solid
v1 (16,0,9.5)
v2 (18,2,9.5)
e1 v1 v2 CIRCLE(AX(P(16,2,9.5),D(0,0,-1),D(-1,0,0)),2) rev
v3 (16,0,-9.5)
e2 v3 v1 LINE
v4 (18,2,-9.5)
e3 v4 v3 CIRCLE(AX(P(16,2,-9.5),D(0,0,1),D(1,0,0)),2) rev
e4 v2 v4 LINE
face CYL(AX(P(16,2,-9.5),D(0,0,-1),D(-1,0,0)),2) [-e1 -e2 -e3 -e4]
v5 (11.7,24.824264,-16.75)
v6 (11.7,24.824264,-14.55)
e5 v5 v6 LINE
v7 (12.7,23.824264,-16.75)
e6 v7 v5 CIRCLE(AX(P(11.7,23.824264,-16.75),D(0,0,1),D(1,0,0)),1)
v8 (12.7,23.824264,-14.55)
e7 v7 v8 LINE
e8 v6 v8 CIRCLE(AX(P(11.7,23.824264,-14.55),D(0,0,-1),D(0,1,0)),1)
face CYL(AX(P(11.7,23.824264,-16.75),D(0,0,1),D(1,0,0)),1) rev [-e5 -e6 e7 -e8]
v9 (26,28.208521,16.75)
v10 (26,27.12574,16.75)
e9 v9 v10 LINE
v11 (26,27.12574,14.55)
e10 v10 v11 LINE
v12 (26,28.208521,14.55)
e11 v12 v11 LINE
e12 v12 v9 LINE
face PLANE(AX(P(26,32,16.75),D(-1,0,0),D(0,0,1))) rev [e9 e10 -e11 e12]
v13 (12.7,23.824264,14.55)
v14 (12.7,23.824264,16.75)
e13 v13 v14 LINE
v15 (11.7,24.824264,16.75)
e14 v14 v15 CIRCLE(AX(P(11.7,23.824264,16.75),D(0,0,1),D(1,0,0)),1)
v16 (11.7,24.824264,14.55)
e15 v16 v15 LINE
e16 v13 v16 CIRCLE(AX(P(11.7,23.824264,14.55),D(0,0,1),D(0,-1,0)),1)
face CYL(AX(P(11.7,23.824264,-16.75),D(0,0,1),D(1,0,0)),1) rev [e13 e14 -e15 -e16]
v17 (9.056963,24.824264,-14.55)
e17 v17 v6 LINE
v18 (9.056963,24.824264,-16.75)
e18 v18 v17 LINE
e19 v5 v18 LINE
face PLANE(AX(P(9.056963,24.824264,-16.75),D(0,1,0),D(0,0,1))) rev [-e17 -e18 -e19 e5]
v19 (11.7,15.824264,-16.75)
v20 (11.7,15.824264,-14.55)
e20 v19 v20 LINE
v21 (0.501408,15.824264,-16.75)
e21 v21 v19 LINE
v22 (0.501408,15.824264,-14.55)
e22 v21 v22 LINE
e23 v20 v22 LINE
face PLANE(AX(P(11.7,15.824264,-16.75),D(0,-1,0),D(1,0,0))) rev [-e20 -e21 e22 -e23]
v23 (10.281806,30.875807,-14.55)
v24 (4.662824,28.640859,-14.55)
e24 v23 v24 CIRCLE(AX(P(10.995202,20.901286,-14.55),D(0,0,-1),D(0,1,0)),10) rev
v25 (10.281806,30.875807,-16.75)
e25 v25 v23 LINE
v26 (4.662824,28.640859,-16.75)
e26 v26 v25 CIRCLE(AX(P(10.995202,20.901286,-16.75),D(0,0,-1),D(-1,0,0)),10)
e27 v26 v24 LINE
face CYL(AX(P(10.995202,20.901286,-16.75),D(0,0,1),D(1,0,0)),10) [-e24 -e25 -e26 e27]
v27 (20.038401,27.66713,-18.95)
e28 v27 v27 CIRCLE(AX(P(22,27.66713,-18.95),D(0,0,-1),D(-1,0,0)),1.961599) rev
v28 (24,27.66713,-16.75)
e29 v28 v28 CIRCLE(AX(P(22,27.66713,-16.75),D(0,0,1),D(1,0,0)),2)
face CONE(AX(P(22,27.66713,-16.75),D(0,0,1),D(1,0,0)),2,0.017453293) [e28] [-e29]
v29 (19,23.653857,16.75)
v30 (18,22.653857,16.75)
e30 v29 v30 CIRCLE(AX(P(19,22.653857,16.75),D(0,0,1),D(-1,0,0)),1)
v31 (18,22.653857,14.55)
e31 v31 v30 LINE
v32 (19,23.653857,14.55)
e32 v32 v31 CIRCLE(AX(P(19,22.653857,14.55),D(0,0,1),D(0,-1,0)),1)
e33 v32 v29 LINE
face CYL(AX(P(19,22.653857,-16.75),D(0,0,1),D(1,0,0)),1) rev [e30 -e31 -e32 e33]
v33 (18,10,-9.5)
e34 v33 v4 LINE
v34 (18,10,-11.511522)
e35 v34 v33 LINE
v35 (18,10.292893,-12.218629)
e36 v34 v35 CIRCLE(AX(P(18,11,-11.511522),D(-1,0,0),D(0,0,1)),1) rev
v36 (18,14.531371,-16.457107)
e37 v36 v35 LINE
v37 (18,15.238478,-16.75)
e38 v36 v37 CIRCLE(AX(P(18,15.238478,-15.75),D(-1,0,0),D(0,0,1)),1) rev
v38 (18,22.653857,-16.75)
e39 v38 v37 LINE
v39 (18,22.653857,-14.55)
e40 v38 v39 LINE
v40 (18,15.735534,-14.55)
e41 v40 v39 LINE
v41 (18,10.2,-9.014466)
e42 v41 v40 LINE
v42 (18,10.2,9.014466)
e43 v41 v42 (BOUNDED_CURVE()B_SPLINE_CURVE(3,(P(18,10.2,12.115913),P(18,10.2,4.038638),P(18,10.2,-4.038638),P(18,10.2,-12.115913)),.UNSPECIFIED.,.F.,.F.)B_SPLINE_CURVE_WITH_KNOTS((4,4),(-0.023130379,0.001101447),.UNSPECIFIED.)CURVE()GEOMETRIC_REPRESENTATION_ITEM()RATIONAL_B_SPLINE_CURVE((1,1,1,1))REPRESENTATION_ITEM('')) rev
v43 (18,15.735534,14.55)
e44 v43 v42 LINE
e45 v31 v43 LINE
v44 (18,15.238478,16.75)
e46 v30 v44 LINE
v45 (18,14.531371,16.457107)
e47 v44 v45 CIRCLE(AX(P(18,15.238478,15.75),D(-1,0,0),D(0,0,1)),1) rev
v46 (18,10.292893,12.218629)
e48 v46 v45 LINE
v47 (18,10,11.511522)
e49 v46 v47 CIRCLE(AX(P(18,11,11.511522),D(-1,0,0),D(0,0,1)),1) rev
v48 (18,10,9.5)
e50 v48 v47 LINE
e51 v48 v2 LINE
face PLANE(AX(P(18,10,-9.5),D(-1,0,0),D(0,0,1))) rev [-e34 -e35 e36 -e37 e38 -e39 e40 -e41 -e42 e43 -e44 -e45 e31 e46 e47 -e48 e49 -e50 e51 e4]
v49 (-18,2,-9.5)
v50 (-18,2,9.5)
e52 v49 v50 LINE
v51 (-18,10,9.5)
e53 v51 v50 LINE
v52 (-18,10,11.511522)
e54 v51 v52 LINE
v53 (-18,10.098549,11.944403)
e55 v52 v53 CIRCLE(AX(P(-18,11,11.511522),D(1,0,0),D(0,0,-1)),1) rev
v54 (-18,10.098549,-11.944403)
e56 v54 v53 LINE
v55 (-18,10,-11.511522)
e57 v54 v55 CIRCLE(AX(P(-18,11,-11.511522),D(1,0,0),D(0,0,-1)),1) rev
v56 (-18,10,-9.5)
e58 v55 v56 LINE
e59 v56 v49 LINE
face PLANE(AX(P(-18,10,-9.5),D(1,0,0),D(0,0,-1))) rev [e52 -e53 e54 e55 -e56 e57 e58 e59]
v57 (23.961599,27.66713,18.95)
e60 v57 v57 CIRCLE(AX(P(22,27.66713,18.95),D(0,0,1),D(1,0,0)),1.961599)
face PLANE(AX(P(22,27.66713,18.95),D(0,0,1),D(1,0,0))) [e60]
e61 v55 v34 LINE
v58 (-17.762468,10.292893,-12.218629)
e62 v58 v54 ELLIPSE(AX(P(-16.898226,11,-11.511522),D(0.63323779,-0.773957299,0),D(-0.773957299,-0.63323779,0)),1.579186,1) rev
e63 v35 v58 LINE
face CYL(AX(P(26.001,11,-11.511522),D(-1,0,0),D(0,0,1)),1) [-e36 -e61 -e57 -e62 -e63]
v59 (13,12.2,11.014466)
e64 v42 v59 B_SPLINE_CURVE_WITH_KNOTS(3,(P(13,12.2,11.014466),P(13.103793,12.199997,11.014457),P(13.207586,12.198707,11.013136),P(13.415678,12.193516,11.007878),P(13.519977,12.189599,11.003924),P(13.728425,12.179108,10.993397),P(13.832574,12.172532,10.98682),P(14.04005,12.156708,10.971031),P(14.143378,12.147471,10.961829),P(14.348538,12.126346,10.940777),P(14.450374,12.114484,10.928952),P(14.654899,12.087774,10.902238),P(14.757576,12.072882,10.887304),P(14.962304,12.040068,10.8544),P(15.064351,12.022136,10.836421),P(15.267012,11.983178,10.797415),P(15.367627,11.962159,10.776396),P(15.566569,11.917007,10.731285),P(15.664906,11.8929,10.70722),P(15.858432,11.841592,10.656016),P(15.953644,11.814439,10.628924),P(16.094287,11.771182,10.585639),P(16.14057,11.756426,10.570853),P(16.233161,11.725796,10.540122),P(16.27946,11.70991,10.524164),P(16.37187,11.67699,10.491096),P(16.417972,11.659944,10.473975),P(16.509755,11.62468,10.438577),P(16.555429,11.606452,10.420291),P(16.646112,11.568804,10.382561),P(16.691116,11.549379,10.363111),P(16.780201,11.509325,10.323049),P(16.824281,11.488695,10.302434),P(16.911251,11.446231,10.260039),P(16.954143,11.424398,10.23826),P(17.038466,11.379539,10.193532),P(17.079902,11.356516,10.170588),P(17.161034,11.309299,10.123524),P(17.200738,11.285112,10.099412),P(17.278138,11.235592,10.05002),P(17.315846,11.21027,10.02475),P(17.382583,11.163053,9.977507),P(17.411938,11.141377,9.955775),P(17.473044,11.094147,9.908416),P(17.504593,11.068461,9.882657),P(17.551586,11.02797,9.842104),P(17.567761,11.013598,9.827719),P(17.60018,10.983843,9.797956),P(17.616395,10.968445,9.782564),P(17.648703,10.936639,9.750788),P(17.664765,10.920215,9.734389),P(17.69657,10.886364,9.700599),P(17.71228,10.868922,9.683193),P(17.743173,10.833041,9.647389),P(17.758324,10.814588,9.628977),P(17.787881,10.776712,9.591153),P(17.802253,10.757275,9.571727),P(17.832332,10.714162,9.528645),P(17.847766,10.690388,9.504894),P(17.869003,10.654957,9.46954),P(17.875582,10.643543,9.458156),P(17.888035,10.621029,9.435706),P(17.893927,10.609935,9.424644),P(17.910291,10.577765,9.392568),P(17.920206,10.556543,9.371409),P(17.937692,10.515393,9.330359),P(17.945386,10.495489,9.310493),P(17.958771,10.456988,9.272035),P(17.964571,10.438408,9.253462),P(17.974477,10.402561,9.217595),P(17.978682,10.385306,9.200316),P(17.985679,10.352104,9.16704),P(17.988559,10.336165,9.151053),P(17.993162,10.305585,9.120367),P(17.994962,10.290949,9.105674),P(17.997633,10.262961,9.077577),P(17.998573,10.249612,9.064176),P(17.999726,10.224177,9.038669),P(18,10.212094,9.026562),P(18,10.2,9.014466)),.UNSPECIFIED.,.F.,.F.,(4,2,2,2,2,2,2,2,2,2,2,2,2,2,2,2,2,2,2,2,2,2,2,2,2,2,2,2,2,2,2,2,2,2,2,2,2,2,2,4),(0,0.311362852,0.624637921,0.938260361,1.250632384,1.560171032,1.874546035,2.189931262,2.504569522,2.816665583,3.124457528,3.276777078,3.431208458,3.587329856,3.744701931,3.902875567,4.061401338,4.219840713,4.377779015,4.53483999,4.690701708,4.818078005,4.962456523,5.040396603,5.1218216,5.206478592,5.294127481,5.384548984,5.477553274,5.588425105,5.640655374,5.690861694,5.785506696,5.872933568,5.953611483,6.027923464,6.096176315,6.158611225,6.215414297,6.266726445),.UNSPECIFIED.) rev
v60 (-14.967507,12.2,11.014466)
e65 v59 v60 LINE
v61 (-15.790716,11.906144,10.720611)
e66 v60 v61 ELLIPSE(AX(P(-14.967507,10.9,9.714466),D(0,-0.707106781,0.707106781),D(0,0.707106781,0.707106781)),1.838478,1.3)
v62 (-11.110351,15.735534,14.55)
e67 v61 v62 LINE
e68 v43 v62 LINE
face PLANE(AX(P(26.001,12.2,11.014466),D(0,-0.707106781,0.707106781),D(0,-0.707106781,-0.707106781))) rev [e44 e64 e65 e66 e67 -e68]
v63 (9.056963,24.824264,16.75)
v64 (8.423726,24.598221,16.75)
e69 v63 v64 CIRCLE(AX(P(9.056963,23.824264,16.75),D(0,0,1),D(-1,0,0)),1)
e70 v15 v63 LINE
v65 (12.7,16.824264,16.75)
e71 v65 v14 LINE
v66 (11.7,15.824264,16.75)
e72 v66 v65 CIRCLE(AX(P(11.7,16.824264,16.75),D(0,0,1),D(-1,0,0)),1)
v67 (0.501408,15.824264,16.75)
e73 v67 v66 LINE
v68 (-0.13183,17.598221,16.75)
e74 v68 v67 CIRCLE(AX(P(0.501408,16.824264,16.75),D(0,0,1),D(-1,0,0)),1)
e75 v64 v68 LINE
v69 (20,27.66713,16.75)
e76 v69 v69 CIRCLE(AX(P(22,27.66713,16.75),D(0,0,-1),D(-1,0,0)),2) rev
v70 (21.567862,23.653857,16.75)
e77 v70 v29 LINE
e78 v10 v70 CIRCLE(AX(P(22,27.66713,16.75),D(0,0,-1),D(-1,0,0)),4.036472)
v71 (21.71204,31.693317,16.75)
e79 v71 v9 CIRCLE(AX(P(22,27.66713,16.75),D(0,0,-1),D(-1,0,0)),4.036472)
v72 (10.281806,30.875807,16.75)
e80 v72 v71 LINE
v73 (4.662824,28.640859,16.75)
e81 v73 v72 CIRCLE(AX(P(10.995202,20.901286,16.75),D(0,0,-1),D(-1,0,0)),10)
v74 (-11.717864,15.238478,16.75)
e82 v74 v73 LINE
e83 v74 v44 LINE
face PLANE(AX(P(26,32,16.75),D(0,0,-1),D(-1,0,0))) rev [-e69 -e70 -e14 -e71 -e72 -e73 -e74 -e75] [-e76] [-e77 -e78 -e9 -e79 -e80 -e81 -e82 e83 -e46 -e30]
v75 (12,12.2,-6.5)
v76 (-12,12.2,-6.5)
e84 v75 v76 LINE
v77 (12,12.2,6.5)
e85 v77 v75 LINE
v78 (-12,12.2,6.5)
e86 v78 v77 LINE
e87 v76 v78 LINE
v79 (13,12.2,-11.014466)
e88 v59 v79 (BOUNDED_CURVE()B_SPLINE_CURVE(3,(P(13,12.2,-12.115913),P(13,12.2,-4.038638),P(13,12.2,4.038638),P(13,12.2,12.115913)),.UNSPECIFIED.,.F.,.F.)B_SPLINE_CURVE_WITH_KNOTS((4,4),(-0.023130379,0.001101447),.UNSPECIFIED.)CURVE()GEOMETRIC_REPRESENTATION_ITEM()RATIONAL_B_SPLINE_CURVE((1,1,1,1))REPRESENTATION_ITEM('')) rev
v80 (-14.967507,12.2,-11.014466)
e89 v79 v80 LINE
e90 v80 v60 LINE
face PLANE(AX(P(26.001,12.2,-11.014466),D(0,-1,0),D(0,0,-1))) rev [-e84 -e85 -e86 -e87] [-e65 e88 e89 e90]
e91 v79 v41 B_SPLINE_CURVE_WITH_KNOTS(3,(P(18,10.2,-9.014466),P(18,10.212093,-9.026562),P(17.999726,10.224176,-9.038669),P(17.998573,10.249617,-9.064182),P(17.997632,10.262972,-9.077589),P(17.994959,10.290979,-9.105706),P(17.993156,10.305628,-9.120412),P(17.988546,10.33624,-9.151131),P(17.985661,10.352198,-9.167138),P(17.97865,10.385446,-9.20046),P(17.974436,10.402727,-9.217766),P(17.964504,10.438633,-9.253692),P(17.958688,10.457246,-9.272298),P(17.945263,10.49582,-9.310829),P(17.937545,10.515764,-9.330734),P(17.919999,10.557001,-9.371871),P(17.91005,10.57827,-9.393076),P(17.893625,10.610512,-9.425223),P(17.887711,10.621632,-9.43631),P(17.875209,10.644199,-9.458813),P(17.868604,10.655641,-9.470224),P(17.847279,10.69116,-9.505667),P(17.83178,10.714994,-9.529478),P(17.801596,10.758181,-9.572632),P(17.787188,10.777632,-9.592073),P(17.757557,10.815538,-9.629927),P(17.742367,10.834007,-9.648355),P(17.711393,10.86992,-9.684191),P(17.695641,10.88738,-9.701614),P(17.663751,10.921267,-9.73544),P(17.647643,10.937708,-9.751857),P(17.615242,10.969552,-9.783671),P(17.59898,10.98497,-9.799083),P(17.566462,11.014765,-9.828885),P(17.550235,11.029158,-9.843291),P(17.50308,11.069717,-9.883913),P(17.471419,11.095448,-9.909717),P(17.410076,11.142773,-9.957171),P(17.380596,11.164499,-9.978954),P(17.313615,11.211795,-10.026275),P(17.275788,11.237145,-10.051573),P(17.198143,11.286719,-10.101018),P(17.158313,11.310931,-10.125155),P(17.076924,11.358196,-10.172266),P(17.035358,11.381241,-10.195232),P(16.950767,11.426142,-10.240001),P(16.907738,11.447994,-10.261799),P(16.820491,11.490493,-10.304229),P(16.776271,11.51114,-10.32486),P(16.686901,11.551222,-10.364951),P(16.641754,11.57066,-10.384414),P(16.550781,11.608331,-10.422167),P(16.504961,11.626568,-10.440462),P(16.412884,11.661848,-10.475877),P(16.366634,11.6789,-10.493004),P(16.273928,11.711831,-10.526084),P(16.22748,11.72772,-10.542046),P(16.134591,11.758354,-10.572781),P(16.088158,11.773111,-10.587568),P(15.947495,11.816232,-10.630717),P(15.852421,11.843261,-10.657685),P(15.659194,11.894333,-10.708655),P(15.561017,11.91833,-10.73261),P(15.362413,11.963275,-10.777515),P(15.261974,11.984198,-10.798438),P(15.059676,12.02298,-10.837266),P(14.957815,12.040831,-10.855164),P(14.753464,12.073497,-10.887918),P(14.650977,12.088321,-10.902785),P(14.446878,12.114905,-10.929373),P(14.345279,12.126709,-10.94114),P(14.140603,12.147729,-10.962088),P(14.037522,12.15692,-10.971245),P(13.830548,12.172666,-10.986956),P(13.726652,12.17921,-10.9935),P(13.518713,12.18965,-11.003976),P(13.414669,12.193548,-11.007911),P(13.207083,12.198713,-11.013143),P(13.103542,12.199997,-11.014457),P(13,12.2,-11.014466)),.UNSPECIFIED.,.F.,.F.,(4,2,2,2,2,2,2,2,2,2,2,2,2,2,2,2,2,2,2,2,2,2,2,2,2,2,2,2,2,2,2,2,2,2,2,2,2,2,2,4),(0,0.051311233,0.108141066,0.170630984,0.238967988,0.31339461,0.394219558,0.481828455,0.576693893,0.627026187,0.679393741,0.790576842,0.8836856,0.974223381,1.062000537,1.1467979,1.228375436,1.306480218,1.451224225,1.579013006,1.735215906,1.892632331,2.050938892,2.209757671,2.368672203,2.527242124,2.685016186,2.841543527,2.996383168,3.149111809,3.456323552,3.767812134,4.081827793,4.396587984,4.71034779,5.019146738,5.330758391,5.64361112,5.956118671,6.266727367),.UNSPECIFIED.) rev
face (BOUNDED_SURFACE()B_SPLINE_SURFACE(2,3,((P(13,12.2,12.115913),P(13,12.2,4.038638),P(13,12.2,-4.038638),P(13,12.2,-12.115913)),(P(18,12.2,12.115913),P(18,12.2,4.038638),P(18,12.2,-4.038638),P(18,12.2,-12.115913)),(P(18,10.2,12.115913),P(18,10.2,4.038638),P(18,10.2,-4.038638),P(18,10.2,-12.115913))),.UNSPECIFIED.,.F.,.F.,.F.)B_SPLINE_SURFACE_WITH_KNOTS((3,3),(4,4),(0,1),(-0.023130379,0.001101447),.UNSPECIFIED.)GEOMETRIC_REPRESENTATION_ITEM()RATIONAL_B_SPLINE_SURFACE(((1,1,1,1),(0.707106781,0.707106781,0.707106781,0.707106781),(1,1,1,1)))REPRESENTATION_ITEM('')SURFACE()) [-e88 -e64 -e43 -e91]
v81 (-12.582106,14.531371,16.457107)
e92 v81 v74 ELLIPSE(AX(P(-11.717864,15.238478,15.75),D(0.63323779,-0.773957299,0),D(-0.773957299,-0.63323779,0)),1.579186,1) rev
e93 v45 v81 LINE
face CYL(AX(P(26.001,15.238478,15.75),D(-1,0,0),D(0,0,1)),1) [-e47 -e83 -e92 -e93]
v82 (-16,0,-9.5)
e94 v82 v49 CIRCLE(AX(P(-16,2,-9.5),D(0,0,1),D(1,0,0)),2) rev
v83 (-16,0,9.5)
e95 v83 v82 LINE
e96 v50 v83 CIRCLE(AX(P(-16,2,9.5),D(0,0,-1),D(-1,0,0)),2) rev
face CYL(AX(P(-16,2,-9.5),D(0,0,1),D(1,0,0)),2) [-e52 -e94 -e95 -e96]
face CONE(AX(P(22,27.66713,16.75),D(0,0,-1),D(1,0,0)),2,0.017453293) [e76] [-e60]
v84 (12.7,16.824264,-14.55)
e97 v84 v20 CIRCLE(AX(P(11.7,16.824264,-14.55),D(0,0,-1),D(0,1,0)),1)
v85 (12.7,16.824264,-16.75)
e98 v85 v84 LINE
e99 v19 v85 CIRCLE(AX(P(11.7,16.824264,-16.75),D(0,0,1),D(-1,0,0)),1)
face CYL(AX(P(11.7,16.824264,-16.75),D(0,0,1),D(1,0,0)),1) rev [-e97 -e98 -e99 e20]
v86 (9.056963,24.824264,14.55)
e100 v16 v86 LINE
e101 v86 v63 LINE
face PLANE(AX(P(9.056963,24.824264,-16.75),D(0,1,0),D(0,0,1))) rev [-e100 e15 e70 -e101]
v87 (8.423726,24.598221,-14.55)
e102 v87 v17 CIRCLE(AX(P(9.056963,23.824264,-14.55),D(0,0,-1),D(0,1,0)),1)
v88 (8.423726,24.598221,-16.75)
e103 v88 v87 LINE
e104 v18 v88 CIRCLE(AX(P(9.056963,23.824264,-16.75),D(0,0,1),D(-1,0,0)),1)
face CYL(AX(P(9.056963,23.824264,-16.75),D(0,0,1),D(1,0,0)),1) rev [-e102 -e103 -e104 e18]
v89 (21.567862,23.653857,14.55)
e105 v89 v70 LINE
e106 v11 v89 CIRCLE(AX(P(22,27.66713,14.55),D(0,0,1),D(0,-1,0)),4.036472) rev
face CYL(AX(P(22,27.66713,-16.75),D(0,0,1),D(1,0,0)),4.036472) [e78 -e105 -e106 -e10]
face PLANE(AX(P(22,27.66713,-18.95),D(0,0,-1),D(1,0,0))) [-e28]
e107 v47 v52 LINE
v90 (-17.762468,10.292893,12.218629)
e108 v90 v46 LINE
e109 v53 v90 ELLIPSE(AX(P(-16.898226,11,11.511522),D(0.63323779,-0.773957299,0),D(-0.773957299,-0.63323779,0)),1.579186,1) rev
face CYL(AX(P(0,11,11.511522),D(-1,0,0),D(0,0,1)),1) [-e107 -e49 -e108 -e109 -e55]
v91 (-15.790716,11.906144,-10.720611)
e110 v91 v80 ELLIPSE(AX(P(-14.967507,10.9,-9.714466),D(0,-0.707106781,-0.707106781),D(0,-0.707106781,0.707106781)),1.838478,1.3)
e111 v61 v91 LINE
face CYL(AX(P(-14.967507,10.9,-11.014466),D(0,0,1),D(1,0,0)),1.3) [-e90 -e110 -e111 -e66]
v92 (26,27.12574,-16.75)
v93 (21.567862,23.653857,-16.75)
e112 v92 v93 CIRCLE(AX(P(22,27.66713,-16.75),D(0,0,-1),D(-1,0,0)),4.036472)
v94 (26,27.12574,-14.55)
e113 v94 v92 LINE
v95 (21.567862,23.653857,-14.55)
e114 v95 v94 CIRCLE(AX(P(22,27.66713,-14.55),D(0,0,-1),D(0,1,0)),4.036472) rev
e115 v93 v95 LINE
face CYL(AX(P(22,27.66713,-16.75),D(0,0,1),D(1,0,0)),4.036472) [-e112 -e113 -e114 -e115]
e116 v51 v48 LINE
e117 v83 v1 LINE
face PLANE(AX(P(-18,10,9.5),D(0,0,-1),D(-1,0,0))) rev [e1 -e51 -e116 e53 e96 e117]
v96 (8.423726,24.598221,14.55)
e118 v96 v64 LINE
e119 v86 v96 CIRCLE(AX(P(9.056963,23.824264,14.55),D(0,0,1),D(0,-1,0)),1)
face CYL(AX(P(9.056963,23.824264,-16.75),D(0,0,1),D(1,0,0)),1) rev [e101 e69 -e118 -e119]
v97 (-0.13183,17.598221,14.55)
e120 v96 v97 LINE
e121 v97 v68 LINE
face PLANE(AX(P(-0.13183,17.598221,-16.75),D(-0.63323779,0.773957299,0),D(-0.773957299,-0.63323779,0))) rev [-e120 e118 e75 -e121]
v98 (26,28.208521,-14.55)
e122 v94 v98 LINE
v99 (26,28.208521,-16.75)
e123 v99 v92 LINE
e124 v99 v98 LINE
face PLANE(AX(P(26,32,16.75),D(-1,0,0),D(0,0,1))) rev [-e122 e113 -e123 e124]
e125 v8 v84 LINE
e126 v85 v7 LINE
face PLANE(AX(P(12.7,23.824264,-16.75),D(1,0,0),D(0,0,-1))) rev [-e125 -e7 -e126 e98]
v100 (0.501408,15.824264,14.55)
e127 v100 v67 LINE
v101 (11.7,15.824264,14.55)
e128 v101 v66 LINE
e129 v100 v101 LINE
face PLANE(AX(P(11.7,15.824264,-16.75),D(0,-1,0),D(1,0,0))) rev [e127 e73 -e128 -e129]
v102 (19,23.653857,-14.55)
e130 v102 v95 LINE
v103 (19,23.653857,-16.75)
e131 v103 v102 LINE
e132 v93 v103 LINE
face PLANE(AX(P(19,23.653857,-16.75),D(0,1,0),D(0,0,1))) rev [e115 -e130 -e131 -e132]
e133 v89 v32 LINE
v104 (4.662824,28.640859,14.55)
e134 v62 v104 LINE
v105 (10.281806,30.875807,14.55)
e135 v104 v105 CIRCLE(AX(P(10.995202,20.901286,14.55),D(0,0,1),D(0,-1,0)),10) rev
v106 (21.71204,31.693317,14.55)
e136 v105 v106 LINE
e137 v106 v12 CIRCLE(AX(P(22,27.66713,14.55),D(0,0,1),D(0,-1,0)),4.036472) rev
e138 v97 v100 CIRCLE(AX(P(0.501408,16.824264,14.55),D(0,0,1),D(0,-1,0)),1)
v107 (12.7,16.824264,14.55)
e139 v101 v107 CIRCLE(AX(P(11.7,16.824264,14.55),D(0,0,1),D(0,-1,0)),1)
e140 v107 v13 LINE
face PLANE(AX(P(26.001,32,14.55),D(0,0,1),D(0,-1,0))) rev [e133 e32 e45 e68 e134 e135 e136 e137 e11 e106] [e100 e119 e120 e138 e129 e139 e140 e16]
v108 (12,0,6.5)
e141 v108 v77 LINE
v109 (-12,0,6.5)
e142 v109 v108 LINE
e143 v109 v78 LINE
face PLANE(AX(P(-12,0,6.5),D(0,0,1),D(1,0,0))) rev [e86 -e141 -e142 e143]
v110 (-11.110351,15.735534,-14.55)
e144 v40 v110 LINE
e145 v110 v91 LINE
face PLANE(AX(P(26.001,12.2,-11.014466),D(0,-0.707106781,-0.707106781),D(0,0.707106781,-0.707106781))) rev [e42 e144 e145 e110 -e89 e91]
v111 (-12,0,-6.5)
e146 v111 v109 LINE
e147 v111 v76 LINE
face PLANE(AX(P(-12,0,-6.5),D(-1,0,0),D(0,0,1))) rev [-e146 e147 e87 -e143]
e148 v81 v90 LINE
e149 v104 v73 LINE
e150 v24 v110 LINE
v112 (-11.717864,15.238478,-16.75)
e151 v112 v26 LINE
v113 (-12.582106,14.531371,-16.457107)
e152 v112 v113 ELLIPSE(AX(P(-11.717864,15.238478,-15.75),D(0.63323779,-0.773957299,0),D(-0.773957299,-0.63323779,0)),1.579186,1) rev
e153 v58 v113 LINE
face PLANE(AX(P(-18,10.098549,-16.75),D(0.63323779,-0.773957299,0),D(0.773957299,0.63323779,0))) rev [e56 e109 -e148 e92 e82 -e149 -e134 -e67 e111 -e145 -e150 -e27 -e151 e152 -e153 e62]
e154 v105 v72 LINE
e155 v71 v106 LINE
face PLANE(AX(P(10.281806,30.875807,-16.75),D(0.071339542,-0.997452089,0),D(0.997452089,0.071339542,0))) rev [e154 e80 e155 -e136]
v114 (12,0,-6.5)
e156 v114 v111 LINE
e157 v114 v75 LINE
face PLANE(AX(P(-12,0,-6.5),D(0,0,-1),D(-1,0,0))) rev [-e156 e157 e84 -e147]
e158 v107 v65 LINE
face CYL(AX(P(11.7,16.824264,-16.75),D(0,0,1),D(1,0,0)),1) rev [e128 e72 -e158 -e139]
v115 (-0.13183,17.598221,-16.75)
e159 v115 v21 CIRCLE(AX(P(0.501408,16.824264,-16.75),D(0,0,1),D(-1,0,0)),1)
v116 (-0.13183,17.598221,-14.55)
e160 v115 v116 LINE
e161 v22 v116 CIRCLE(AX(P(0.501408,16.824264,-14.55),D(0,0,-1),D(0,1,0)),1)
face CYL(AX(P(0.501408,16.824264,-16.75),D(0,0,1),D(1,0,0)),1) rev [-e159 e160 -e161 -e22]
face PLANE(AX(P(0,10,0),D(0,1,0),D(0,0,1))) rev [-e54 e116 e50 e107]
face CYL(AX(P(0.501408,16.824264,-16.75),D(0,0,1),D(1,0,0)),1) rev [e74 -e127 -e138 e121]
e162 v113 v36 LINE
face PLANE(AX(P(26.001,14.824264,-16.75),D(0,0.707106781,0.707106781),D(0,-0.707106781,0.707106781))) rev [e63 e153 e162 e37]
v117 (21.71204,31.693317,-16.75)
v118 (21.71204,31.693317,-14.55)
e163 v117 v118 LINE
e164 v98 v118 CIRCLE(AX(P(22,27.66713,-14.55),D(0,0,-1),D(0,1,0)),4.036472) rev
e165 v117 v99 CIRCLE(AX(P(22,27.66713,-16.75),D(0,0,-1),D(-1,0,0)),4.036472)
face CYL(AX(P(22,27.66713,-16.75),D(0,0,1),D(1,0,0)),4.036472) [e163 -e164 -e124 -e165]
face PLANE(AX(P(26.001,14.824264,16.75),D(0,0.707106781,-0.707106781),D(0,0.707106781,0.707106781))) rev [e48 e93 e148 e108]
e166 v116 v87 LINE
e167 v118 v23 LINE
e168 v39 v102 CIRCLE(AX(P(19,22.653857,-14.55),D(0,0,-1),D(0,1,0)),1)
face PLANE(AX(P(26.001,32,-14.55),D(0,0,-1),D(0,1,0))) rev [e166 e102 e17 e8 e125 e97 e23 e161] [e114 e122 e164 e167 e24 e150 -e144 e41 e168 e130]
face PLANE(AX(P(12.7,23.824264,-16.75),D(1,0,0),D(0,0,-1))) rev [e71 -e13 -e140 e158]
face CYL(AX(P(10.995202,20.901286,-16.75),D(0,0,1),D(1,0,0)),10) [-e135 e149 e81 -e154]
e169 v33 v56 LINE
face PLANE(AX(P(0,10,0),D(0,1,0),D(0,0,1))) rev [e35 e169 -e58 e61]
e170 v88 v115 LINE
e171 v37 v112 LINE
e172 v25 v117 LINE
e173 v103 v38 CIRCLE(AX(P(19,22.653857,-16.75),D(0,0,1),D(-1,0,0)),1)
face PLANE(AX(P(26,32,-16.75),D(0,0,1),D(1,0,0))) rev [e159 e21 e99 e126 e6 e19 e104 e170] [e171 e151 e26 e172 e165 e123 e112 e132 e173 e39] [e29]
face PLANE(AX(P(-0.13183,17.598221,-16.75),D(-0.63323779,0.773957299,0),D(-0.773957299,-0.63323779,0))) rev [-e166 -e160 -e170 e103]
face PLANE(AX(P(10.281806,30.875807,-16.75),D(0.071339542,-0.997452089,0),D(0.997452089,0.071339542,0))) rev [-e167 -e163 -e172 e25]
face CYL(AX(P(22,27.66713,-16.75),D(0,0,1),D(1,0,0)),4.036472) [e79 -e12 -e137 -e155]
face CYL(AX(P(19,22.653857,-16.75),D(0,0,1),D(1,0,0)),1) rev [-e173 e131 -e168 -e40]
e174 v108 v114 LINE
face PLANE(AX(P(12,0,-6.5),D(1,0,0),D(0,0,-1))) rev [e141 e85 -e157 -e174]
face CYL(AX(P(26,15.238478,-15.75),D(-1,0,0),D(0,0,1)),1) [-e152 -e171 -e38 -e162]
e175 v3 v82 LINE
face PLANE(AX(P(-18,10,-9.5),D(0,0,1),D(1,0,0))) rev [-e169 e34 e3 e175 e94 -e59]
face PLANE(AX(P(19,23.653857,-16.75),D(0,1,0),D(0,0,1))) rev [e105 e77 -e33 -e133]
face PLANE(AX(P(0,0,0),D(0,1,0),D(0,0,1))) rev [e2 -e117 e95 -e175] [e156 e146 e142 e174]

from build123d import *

# Parameters (mm, degrees)
SKETCH1_W           = 36
SKETCH1_H           = 19
BOSS_EXTRUDE1_DEPTH = 10
SKETCH2_W           = 24
SKETCH2_H           = 13
CUT_EXTRUDE1_DEPTH  = 10
SKETCH3_W           = 44
SKETCH3_H           = 33.5
BOSS_EXTRUDE2_DEPTH = 22
CUT_EXTRUDE2_REACH  = 58.926
CUT_EXTRUDE3_REACH  = 58.926
CUT_EXTRUDE4_DEPTH  = 54.124852941
CUT_EXTRUDE6_DEPTH  = 54.124852941
CUT_EXTRUDE7_DEPTH  = 54.124852941
SKETCH12_R          = 2
BOSS_EXTRUDE3_DEPTH = 2.2
BOSS_EXTRUDE3_TAPER = 1
CUT_EXTRUDE8_REACH  = 40.809
SKETCH13_W          = 24
SKETCH13_H          = 13
FILLET1_R           = 2
FILLET2_R           = 1
FILLET4_SIZE        = 2
FILLET4_SIZE_2      = 5
FILLET5_R           = 1.3


with BuildPart() as part:
    # Sketch1 → Boss-Extrude1 (new body)
    with BuildSketch(Plane(origin=(0, 0, 0), x_dir=(1, 0, 0), z_dir=(0, 1, 0))):
        Rectangle(SKETCH1_W, SKETCH1_H)
    extrude(amount=BOSS_EXTRUDE1_DEPTH)

    # Sketch2 → Cut-Extrude1 (cut)
    with BuildSketch(Plane(origin=(0, 10, 0), x_dir=(1, 0, 0), z_dir=(0, 1, 0))):
        Rectangle(SKETCH2_W, SKETCH2_H)
    extrude(amount=-CUT_EXTRUDE1_DEPTH, mode=Mode.SUBTRACT)

    # Sketch3 → Boss-Extrude2 (add)
    with BuildSketch(Plane(origin=(0, 10, 0), x_dir=(1, 0, 0), z_dir=(0, 1, 0))):
        with Locations((4, 0)):
            Rectangle(SKETCH3_W, SKETCH3_H)
    extrude(amount=BOSS_EXTRUDE2_DEPTH)

    # Sketch5 → Cut-Extrude2 (cut, up to next)
    with BuildSketch(Plane.ZY.offset(18), mode=Mode.PRIVATE) as cut_extrude2_sk1:
        Polygon((-14.55, 32), (14.55, 32), (14.55, 15.735533906), (11.014466094, 12.2), (-11.014466094, 12.2), (-14.55, 15.735533906), align=None)
    cut_extrude2_tool1 = extrude(cut_extrude2_sk1.sketch, amount=-CUT_EXTRUDE2_REACH, mode=Mode.PRIVATE) & part.part
    add(cut_extrude2_tool1.solids().sort_by_distance((-18, 22.293405, 0))[0], mode=Mode.SUBTRACT)

    # Sketch7 → Cut-Extrude3 (cut, up to next)
    with BuildSketch(Plane.ZY.offset(18), mode=Mode.PRIVATE) as cut_extrude3_sk1:
        Polygon((-16.75, 14.824264069), (-11.925735931, 10), (-16.75, 10), align=None)
    cut_extrude3_tool1 = extrude(cut_extrude3_sk1.sketch, amount=-CUT_EXTRUDE3_REACH, mode=Mode.PRIVATE) & part.part
    # Sketch7 → Cut-Extrude3 (cut, up to next)
    with BuildSketch(Plane.ZY.offset(18), mode=Mode.PRIVATE) as cut_extrude3_sk2:
        Polygon((16.75, 14.824264069), (11.925735931, 10), (16.75, 10), align=None)
    cut_extrude3_tool2 = extrude(cut_extrude3_sk2.sketch, amount=-CUT_EXTRUDE3_REACH, mode=Mode.PRIVATE) & part.part
    add(cut_extrude3_tool1.solids().sort_by_distance((-18, 11.608088, -15.141912))[0], mode=Mode.SUBTRACT)
    add(cut_extrude3_tool2.solids().sort_by_distance((-18, 11.608088, 15.141912))[0], mode=Mode.SUBTRACT)

    # Sketch9 → Cut-Extrude4 (cut, through all)
    with BuildSketch(Plane.XY.offset(16.75)):
        with BuildLine():
            Line((12.7, 23.824264069), (12.7, 16.824264069))
            ThreePointArc((12.7, 16.824264069), (12.407106781, 16.117157288), (11.7, 15.824264069))
            Line((11.7, 15.824264069), (0.501407823, 15.824264069))
            ThreePointArc((0.501407823, 15.824264069), (-0.440387617, 16.488077587), (-0.131829968, 17.598221368))
            Line((-0.131829968, 17.598221368), (8.423725588, 24.598221368))
            ThreePointArc((8.423725588, 24.598221368), (8.720776897, 24.766059508), (9.056963378, 24.824264069))
            Line((9.056963378, 24.824264069), (11.7, 24.824264069))
            ThreePointArc((11.7, 24.824264069), (12.407106781, 24.53137085), (12.7, 23.824264069))
        make_face()
    extrude(amount=-CUT_EXTRUDE4_DEPTH, mode=Mode.SUBTRACT)

    # Sketch10 → Cut-Extrude6 (cut, through all)
    with BuildSketch(Plane.XY.offset(16.75)):
        with BuildLine():
            Line((-18, 10.098548576), (4.662823879, 28.640859022))
            ThreePointArc((4.662823879, 28.640859022), (7.299328616, 30.193246078), (10.281806361, 30.875806919))
            Line((10.281806361, 30.875806919), (26, 32))
            Line((26, 32), (-18, 32))
            Line((-18, 32), (-18, 10.098548576))
        make_face()
    extrude(amount=-CUT_EXTRUDE6_DEPTH, mode=Mode.SUBTRACT)

    # Sketch11 → Cut-Extrude7 (cut, through all)
    with BuildSketch(Plane.XY.offset(16.75)):
        with BuildLine():
            Line((18, 10), (18, 22.653857453))
            ThreePointArc((18, 22.653857453), (18.292893219, 23.360964234), (19, 23.653857453))
            Line((19, 23.653857453), (21.567861559, 23.653857453))
            ThreePointArc((21.567861559, 23.653857453), (26.035822704, 27.594752604), (21.71203996, 31.693317495))
            Line((21.71203996, 31.693317495), (18, 31.427825814))
            Line((18, 31.427825814), (18, 34.061365202))
            Line((18, 34.061365202), (30.208332635, 34.9345268))
            Line((30.208332635, 34.9345268), (29.247958423, 10))
            Line((29.247958423, 10), (18, 10))
        make_face()
    extrude(amount=-CUT_EXTRUDE7_DEPTH, mode=Mode.SUBTRACT)

    # Sketch12 → Boss-Extrude3 (add)
    with BuildSketch(Plane.XY.offset(16.75)):
        with Locations((22, 27.667130408)):
            Circle(SKETCH12_R)
    boss_extrude3 = extrude(amount=BOSS_EXTRUDE3_DEPTH, taper=BOSS_EXTRUDE3_TAPER)

    # Mirror1: Boss-Extrude3 across plane
    add(boss_extrude3.mirror(Plane.XY))

    # Sketch13 → Cut-Extrude8 (cut, up to next)
    with BuildSketch(Plane.XZ.offset(-10), mode=Mode.PRIVATE) as cut_extrude8_sk1:
        Rectangle(SKETCH13_W, SKETCH13_H)
    cut_extrude8_tool1 = extrude(cut_extrude8_sk1.sketch, amount=-CUT_EXTRUDE8_REACH, mode=Mode.PRIVATE) & part.part
    add(cut_extrude8_tool1.solids().sort_by_distance((0, 10, 0))[0], mode=Mode.SUBTRACT)

    # Fillet1
    fillet1_edges = [part.edges().sort_by_distance(p)[0] for p in [
        (-18, 0, 0),
        (18, 0, 0),
    ]]
    fillet(fillet1_edges, radius=FILLET1_R)

    # Fillet2
    fillet2_edges = [part.edges().sort_by_distance(p)[0] for p in [
        (2.887937246, 14.824264069, -16.75),
        (2.887937246, 14.824264069, 16.75),
        (0, 10, -11.925735931),
        (0, 10, 11.925735931),
    ]]
    fillet(fillet2_edges, radius=FILLET2_R)

    # Fillet4
    # a fillet whose section is not a circle: 5, 2 mm, written as the material it takes off along each edge
    with BuildSketch(Plane(origin=(18, 12.2, 23.514466094), x_dir=(0, -1, 0), z_dir=(0, 0, -1))) as fillet4_piece_1_section:
        with BuildLine():
            Bezier((FILLET4_SIZE, 0), (0, 0), (0, FILLET4_SIZE_2), weights=[1, 0.707106781, 1])
            Line((0, FILLET4_SIZE_2), (0, 0))
            Line((0, 0), (FILLET4_SIZE, 0))
        make_face()
    fillet4_piece_1 = extrude(amount=47.028932188, mode=Mode.PRIVATE)
    fillet4_piece_1 = split(fillet4_piece_1, bisect_by=Plane(origin=(18, 18.45, 17.264466094), z_dir=(0, 0.7071067811865465, -0.7071067811865486)), keep=Keep.TOP, mode=Mode.PRIVATE)
    fillet4_piece_1 = split(fillet4_piece_1, bisect_by=Plane(origin=(18, -5.064466094, 6.25), z_dir=(0, 0.7071067811865478, 0.7071067811865474)), keep=Keep.TOP, mode=Mode.PRIVATE)
    add(fillet4_piece_1, mode=Mode.SUBTRACT)

    # Fillet5
    fillet5_edges = [part.edges().sort_by_distance(p)[0] for p in [
        (-15.43155937, 12.2, 0),
    ]]
    fillet(fillet5_edges, radius=FILLET5_R)


solid = part.part
